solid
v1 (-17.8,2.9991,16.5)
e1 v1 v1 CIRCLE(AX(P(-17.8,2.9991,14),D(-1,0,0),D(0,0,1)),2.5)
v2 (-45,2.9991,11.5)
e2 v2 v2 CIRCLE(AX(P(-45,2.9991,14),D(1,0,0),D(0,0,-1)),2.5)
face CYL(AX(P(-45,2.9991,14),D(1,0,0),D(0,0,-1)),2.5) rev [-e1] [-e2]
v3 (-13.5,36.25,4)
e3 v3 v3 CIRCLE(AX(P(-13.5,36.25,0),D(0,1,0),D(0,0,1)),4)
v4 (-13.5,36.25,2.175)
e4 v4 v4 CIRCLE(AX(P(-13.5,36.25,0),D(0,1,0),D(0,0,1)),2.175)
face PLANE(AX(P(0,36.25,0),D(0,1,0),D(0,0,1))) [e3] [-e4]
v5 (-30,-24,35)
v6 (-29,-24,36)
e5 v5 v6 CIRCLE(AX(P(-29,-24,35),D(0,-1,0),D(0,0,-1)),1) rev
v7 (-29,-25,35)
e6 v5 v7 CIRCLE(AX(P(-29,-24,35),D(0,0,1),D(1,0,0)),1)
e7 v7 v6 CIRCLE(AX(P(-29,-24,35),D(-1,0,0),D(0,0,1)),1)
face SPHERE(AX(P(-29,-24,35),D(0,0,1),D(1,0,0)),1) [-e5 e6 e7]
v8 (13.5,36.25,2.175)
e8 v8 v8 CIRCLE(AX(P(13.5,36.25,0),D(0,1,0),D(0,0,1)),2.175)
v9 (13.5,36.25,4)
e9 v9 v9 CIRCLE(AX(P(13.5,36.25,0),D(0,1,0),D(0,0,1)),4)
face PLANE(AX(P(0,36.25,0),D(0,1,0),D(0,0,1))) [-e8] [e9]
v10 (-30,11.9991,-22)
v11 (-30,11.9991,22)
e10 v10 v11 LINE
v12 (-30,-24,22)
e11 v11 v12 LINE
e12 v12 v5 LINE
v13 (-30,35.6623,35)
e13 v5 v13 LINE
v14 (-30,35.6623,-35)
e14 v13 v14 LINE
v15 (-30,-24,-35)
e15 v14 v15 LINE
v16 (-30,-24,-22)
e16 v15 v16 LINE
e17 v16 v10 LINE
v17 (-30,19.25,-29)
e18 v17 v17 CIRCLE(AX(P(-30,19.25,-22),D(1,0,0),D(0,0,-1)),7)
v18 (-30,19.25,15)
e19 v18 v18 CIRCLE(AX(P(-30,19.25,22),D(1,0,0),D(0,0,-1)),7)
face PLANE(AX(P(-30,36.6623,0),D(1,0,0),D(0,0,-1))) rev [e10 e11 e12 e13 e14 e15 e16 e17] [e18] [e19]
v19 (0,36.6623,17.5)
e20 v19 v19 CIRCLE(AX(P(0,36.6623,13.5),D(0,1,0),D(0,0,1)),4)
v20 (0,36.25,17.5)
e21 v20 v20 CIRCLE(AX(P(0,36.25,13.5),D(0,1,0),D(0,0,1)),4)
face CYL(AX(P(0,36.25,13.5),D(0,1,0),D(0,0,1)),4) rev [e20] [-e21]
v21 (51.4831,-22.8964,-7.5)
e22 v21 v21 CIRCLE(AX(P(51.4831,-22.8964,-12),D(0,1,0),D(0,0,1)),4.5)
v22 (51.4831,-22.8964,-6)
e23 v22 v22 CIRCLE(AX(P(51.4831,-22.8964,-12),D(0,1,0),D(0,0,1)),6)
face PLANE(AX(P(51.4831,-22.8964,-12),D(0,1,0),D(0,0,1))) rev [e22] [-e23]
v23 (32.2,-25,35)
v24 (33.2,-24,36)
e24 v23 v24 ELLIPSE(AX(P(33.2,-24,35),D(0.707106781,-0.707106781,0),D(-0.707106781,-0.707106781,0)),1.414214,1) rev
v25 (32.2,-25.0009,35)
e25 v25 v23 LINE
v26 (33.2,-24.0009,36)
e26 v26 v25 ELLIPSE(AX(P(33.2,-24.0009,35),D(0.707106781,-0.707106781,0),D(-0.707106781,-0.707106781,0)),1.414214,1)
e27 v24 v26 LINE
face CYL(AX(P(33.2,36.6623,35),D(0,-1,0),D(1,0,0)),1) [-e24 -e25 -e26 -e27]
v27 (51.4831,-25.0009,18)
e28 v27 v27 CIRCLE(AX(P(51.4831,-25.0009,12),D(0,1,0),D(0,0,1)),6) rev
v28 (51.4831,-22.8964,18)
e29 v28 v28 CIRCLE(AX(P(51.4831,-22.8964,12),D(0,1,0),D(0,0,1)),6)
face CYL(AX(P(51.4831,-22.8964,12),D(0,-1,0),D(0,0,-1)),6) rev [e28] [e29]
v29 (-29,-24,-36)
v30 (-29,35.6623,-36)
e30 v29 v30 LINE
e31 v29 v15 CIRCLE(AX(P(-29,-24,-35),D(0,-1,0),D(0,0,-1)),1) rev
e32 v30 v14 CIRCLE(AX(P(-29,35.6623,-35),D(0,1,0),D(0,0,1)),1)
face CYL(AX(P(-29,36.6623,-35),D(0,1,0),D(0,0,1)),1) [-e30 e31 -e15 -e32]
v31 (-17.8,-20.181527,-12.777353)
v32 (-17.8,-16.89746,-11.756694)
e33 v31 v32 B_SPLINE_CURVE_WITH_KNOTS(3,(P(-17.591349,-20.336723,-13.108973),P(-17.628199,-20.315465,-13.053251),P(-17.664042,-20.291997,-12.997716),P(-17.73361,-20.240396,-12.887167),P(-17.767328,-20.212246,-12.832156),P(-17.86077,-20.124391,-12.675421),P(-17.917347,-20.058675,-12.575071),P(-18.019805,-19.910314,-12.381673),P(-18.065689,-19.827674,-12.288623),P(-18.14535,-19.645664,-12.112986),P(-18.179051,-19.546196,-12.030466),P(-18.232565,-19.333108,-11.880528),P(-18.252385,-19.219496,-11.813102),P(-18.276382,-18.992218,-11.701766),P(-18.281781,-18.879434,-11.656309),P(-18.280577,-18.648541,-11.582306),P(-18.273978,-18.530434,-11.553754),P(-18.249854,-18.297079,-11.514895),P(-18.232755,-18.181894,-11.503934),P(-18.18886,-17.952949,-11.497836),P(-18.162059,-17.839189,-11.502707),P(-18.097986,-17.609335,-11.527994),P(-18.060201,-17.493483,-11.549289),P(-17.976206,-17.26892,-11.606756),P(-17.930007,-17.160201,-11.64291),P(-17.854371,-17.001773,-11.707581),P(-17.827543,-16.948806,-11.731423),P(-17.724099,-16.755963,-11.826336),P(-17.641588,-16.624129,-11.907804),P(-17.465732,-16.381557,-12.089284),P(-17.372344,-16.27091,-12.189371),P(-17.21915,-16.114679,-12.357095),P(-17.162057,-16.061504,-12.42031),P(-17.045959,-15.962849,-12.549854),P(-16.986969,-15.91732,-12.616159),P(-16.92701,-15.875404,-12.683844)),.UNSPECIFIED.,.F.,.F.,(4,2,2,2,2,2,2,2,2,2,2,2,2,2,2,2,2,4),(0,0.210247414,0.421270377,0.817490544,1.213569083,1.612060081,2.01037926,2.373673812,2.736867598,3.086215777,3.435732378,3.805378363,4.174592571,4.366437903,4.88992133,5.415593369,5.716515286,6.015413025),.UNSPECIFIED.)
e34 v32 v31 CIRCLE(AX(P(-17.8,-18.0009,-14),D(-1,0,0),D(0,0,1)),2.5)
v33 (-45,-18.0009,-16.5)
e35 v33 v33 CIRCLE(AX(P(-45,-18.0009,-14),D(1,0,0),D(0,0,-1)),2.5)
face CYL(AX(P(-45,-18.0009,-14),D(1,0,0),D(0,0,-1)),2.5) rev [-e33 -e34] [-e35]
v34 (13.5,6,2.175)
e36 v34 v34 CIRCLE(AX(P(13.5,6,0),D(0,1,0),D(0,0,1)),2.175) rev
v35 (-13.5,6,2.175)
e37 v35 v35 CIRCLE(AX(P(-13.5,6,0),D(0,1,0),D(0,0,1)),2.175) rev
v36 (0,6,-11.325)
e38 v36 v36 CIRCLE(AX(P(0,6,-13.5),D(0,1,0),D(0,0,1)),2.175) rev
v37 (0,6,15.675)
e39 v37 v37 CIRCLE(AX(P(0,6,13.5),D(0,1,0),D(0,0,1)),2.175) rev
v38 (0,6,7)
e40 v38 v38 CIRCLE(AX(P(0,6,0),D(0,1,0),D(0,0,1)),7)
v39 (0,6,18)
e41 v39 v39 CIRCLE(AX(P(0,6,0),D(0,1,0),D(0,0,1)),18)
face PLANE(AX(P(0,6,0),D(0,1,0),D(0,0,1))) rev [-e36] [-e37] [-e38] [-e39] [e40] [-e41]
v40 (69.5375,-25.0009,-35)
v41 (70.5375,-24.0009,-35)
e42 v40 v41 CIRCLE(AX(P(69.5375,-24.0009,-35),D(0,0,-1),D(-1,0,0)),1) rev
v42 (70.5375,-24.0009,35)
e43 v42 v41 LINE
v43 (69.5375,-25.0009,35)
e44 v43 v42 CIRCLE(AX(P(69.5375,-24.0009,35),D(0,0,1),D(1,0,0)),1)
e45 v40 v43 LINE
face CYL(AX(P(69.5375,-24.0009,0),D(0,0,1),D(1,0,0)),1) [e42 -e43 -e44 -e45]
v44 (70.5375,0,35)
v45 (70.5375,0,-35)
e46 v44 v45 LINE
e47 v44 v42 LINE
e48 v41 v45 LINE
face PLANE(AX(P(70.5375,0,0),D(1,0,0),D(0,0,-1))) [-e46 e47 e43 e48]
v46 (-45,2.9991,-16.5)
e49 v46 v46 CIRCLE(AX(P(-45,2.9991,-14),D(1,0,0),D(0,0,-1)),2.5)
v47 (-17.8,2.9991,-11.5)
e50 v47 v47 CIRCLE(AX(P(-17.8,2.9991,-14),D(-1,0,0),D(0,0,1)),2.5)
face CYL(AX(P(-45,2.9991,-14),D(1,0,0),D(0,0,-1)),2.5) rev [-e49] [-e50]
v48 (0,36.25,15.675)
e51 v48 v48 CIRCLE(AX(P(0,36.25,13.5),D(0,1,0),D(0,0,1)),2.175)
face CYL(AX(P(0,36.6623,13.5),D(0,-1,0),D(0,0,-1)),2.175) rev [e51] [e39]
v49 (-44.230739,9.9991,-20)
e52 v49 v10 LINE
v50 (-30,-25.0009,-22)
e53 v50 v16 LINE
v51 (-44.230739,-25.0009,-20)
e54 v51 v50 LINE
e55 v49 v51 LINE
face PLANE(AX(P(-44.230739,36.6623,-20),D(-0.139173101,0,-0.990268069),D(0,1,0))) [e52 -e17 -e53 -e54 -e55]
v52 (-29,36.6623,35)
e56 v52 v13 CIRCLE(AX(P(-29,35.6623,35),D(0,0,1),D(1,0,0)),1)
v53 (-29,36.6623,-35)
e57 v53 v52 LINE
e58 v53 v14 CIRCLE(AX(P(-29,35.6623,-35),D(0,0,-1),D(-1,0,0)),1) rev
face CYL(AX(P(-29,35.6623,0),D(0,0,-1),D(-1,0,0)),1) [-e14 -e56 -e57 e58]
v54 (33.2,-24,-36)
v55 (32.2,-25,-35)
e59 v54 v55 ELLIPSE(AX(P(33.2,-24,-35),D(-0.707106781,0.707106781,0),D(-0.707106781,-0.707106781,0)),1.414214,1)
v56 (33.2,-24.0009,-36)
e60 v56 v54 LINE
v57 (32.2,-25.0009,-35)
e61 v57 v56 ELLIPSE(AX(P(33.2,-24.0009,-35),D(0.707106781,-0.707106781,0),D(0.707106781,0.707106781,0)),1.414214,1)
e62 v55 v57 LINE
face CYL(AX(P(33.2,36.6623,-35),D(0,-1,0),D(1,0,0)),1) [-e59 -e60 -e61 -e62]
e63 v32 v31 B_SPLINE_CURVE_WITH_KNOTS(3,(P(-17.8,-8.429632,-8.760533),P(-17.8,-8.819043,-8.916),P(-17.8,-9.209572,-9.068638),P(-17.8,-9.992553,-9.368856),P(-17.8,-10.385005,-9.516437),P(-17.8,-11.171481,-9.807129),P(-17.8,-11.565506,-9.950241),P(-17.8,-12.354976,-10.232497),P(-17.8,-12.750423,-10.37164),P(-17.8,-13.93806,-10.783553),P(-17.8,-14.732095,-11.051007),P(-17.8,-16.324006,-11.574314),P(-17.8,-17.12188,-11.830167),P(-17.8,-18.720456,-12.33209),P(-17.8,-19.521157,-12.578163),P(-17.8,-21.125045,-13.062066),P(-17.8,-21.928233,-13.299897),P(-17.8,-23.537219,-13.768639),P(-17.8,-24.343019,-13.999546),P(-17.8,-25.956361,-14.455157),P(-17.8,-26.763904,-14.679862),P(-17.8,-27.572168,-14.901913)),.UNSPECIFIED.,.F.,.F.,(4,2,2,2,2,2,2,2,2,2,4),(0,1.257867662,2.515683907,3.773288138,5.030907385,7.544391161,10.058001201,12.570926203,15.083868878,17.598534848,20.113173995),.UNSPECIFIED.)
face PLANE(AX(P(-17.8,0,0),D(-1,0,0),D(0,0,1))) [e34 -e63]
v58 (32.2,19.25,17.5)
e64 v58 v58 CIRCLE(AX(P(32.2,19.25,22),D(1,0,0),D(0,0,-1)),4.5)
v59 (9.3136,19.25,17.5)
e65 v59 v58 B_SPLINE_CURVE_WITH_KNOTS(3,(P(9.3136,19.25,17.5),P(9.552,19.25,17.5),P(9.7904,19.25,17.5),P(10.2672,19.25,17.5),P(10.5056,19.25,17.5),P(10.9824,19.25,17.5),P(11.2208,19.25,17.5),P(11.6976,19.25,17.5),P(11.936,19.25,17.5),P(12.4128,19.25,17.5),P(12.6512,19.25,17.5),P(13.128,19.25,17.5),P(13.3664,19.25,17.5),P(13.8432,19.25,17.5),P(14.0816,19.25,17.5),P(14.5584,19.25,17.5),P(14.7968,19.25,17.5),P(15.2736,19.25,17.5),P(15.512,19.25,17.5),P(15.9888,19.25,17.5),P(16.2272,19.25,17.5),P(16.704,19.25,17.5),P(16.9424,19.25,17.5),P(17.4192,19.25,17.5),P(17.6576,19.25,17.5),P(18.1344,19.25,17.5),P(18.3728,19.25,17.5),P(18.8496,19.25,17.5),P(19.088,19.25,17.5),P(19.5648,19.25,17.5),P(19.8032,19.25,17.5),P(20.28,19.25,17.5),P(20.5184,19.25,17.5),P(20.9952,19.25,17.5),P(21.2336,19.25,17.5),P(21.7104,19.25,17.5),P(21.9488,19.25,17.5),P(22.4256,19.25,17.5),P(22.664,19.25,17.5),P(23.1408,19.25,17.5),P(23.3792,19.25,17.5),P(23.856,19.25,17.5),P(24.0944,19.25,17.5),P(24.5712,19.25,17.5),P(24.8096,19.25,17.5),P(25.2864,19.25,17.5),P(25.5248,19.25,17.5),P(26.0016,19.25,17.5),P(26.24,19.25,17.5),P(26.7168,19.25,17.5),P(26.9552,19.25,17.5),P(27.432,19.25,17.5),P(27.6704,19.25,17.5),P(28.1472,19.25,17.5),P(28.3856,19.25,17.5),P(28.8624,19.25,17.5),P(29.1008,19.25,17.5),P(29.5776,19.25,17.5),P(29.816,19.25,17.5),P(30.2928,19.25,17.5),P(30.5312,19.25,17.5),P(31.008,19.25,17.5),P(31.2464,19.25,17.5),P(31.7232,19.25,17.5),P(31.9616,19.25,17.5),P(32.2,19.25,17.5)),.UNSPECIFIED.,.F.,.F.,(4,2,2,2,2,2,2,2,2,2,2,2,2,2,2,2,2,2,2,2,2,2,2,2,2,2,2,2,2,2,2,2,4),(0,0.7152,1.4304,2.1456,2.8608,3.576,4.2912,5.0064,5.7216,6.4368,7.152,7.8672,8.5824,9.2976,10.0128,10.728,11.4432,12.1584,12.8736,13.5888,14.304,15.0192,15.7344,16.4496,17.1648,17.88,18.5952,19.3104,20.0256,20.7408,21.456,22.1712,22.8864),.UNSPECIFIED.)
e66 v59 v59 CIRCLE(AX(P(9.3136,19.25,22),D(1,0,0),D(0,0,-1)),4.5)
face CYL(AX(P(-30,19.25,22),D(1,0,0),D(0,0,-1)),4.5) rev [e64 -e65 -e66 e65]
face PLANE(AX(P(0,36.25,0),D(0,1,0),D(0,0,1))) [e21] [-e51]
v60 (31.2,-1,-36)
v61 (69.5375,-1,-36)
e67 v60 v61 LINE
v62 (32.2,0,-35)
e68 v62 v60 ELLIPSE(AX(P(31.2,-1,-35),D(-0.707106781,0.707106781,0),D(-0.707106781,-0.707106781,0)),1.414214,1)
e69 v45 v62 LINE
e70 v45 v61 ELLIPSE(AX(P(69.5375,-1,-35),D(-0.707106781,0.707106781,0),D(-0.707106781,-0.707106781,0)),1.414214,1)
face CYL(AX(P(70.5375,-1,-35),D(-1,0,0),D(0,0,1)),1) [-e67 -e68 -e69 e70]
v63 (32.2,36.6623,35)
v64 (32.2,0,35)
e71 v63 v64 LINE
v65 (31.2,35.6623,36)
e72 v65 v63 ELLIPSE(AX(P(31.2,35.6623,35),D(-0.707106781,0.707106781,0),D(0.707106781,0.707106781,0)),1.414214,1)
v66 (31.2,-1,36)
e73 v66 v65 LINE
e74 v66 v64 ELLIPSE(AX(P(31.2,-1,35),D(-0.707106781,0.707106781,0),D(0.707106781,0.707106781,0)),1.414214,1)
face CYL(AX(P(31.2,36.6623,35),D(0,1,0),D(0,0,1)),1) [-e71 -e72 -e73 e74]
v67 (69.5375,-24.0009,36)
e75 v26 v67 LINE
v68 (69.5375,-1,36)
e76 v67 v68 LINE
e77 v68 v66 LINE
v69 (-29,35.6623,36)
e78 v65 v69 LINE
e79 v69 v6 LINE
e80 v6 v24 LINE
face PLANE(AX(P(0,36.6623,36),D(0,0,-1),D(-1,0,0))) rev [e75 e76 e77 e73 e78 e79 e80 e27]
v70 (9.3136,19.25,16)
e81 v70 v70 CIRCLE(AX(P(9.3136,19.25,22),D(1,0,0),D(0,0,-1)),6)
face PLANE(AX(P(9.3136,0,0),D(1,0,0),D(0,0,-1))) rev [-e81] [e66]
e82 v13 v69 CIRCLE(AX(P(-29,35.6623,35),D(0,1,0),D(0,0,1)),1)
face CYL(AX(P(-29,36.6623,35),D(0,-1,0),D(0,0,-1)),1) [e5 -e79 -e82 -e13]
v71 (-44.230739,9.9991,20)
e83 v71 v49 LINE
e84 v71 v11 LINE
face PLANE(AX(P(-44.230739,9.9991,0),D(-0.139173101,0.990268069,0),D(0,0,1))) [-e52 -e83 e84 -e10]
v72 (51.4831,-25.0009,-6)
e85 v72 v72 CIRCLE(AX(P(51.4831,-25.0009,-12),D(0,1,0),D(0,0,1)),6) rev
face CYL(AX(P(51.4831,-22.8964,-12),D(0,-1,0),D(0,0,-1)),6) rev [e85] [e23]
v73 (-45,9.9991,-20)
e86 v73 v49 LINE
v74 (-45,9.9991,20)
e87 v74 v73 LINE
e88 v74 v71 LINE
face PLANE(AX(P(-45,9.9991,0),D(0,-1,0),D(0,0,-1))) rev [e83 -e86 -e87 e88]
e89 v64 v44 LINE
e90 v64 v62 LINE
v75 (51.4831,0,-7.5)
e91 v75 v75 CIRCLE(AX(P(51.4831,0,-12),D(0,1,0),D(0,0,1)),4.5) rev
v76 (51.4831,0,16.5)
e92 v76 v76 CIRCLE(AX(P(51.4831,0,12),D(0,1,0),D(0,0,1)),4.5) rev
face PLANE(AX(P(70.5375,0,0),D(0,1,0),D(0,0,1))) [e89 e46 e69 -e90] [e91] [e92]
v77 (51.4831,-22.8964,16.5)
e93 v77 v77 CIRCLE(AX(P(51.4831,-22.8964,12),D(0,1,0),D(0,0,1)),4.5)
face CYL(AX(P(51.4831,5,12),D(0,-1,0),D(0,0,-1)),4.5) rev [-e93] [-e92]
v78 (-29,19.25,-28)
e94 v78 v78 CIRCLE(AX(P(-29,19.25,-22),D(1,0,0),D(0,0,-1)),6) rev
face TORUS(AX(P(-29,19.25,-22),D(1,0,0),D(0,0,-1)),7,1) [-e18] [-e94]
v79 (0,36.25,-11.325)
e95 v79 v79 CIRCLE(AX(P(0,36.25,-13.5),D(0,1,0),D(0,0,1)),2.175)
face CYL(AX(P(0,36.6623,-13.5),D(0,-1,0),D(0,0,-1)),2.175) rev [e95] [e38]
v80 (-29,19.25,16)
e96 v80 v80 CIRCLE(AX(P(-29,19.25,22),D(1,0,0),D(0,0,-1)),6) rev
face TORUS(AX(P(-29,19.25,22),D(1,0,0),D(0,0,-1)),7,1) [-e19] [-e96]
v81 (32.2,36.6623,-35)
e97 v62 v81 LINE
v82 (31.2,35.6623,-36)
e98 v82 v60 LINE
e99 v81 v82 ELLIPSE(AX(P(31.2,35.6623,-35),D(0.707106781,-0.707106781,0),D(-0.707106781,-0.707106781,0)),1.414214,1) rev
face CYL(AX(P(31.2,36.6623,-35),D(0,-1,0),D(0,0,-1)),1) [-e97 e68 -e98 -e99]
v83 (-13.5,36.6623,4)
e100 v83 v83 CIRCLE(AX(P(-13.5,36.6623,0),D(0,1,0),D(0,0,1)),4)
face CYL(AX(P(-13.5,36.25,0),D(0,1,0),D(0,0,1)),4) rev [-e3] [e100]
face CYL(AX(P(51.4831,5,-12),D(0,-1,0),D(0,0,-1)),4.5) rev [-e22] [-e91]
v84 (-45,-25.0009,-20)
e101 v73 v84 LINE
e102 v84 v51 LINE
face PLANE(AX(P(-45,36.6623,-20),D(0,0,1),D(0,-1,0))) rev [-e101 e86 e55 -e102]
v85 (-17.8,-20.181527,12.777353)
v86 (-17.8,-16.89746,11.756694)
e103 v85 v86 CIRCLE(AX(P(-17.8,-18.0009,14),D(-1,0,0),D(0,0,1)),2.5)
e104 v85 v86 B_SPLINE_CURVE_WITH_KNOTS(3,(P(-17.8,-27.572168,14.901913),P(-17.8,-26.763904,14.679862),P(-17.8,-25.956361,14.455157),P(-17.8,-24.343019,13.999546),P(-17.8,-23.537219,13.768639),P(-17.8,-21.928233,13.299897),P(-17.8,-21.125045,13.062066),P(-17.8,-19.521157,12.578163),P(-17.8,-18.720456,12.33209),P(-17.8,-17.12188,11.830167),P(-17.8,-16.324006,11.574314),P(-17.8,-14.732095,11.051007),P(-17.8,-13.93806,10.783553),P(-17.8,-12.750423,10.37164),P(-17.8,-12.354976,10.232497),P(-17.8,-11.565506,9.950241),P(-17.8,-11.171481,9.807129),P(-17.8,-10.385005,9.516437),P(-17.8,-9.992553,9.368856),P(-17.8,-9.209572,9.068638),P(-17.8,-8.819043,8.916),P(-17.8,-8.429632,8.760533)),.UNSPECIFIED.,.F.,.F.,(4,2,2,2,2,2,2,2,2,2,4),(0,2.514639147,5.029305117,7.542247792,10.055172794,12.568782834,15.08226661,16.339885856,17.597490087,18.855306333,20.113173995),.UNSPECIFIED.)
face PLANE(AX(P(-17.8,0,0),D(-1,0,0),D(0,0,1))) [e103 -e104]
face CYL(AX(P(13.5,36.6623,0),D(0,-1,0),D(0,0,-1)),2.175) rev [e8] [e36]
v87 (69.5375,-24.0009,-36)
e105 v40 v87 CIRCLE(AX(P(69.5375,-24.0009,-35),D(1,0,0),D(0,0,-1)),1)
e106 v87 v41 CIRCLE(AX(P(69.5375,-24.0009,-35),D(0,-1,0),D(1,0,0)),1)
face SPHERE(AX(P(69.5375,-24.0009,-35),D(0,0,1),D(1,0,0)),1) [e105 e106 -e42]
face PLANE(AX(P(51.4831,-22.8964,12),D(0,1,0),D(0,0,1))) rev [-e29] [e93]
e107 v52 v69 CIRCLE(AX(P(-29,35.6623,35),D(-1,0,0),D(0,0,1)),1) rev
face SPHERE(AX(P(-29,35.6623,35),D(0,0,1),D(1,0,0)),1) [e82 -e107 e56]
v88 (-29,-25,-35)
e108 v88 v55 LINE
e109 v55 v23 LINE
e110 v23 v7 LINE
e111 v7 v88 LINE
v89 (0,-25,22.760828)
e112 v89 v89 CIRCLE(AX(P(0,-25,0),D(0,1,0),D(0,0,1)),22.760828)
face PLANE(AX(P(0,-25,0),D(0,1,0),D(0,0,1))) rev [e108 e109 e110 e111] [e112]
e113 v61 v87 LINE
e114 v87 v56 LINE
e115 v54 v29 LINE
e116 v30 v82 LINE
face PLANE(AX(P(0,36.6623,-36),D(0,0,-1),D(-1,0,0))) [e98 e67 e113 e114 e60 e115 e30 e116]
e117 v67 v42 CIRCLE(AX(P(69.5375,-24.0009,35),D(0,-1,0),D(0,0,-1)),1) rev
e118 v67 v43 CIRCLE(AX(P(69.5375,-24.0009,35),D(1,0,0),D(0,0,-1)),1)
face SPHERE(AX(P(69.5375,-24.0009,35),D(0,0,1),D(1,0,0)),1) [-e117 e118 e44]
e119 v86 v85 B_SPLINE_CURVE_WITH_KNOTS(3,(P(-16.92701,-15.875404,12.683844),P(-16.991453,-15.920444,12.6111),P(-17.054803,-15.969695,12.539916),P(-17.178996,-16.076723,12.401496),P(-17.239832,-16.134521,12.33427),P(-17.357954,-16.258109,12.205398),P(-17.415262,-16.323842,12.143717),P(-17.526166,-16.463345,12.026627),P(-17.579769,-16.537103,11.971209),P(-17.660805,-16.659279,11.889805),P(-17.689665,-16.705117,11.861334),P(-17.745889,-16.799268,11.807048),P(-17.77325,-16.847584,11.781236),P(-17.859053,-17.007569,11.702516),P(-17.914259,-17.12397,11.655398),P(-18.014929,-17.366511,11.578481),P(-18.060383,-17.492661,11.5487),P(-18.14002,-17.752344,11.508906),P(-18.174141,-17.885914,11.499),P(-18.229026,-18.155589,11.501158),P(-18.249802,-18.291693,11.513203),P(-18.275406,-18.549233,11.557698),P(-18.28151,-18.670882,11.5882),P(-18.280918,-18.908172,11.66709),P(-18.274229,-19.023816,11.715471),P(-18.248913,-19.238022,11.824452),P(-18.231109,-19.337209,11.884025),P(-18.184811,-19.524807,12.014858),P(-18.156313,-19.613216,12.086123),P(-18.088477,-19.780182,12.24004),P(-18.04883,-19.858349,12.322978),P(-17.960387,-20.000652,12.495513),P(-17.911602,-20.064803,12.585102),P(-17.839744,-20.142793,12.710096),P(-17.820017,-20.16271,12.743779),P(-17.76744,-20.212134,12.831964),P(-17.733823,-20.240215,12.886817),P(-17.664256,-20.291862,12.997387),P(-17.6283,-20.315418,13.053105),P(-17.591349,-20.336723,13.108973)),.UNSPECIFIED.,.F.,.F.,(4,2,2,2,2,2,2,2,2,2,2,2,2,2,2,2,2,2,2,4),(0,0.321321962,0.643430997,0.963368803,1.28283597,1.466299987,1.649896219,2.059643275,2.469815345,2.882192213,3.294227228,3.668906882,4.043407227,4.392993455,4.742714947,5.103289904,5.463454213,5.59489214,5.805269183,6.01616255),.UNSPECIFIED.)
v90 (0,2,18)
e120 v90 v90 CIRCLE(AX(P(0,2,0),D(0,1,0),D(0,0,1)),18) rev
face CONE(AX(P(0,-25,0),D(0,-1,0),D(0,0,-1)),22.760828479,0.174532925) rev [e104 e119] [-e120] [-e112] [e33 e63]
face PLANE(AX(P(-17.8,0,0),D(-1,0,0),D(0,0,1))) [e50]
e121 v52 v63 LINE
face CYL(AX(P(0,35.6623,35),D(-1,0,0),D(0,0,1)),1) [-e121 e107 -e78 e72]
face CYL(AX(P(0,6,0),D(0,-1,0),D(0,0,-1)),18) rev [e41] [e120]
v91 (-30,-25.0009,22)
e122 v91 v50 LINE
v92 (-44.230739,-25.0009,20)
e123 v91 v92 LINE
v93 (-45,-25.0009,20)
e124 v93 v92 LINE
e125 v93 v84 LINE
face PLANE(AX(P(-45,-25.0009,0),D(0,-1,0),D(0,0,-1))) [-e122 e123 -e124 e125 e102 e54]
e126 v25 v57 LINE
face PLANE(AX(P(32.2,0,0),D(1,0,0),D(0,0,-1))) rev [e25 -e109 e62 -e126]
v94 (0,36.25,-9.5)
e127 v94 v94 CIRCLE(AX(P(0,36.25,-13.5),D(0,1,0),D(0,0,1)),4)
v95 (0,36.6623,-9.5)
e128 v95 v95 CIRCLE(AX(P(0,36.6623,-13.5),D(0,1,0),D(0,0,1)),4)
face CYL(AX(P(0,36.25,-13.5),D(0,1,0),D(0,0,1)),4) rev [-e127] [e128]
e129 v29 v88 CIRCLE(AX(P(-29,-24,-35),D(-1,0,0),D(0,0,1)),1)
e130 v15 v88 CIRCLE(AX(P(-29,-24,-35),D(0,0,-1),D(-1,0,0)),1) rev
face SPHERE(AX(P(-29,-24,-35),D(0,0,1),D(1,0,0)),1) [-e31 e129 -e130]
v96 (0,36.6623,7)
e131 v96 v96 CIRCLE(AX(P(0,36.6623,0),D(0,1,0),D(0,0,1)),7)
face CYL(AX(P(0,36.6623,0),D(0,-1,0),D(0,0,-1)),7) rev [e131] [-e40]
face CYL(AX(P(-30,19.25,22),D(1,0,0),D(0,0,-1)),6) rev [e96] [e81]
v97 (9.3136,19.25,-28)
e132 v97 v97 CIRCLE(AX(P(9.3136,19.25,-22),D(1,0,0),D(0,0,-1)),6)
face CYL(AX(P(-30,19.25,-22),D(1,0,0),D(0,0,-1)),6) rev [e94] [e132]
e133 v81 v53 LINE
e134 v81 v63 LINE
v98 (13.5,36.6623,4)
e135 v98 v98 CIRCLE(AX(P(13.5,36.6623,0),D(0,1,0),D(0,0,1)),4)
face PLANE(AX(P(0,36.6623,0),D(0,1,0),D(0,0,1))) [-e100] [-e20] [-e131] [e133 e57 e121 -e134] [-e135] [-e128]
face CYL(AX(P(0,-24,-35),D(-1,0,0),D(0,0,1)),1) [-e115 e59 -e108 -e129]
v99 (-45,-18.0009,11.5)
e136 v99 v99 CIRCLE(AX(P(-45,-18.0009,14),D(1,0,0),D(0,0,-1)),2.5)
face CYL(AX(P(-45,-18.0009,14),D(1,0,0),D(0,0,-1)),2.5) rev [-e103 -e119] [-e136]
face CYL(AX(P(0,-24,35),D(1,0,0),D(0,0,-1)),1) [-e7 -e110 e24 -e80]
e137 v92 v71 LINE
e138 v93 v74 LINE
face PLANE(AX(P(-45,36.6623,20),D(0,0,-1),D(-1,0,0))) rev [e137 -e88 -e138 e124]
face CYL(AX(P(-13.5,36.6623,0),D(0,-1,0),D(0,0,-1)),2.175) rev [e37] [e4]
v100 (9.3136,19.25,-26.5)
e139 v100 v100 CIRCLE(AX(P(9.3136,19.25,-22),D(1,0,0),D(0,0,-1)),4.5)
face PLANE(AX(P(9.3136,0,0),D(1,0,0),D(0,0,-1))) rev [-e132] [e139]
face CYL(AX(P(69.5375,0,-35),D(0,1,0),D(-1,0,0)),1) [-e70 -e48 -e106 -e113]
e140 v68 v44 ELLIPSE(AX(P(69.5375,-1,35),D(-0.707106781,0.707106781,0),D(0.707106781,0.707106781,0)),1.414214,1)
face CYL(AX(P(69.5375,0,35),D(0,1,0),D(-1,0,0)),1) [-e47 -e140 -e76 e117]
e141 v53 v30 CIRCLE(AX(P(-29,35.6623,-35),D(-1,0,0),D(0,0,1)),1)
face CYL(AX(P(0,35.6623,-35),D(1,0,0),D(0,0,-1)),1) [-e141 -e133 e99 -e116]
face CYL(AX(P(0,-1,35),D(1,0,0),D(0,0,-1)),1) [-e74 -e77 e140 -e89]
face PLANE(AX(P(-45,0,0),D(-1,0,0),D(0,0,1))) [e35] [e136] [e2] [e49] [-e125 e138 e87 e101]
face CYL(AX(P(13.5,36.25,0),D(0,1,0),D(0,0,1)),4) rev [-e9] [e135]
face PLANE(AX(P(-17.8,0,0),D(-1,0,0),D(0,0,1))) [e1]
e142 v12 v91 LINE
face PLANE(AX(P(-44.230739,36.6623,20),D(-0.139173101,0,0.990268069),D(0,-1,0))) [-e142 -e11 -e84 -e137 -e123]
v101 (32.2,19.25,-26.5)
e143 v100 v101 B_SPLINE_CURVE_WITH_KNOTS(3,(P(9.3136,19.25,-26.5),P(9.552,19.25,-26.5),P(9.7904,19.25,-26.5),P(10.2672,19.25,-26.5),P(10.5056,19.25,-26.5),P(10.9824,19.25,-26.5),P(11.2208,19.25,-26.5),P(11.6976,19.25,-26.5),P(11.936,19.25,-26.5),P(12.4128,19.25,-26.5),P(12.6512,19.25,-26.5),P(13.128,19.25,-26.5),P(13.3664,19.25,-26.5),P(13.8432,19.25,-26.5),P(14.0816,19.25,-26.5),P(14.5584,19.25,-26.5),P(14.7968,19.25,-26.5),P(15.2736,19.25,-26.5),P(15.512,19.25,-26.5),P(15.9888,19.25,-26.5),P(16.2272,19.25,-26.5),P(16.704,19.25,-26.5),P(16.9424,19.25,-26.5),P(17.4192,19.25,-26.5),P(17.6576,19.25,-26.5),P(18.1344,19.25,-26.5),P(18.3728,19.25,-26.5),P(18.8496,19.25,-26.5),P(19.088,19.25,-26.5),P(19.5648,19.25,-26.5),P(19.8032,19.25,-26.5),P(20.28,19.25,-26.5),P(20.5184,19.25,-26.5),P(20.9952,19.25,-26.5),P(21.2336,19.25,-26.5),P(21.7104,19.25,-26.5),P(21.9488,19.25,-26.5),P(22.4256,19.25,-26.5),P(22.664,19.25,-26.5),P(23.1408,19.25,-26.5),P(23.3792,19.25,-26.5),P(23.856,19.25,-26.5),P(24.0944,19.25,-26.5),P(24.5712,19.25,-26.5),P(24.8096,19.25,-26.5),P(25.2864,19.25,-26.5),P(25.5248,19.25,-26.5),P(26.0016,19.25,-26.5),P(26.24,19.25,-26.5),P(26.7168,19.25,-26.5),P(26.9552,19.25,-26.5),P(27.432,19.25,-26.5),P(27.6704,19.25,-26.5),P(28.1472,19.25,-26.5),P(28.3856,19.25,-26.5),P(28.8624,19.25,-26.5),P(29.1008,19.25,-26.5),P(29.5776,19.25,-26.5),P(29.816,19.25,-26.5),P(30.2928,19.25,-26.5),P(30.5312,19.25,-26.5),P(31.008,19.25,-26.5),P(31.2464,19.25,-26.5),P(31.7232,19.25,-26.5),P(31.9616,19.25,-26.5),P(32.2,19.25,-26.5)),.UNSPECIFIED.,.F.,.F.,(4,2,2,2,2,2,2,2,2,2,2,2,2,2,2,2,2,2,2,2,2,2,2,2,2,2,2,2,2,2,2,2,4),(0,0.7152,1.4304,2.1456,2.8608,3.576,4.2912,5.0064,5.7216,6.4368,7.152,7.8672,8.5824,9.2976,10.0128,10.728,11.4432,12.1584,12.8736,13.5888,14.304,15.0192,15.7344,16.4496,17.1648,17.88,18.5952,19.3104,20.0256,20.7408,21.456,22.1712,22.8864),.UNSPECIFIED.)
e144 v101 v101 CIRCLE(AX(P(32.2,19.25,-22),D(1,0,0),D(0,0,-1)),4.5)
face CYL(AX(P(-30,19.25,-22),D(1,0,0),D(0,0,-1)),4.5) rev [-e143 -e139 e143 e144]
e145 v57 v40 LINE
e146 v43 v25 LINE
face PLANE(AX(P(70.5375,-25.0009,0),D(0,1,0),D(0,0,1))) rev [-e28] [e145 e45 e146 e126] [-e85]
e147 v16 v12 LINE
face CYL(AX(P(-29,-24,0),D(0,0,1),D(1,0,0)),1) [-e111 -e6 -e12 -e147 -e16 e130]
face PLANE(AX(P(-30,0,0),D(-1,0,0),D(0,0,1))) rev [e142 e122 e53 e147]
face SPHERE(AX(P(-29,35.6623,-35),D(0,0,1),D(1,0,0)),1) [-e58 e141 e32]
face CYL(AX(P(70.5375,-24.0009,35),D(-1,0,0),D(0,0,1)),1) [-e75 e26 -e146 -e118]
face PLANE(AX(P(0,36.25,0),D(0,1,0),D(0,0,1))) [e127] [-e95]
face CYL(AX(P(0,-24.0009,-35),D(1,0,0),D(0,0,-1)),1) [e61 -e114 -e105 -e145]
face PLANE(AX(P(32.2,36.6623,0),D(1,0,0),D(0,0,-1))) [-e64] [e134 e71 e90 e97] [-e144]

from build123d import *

# Parameters (mm, degrees)
SKETCH1_W               = 62.2
SKETCH1_H               = 72
SKETCH1_R               = 18
SKETCH1_R_2             = 2.175
SKETCH1_R_3             = 7
SKETCH1_R_4             = 9.5
SKETCH1_R_5             = 4
BOSS_EXTRUDE1_DEPTH     = 36.6623
SKETCH1_3_R             = 18
CUT_EXTRUDE1_DEPTH      = 6
SKETCH2_R               = 4.5
CUT_EXTRUDE3_DEPTH      = 81.678152193
BOSS_EXTRUDE2_START     = -25
SKETCH1_6_W             = 62.2
SKETCH1_6_H             = 72
SKETCH1_6_R             = 18
BOSS_EXTRUDE2_DEPTH     = 25
SKETCH2_3_W             = 72
SKETCH2_3_H             = 25.0009
BOSS_EXTRUDE3_DEPTH     = 38.3375
SKETCH1_7_R             = 2.175
CUT_EXTRUDE4_DEPTH      = 88.267766945
CUT_EXTRUDE6_START      = 36.25
SKETCH1_8_R             = 4
SKETCH1_8_R_2           = 2.175
CUT_EXTRUDE6_DEPTH      = 5
CUT_EXTRUDE7_DEPTH      = 5
CUT_EXTRUDE7_DEPTH_BACK = 88.267766945
SKETCH1_9_R             = 4.5
CUT_EXTRUDE8_START      = -22.8864
SKETCH2_4_R             = 6
SKETCH2_4_R_2           = 4.5
CUT_EXTRUDE8_DEPTH      = 58.791752193
CUT_EXTRUDE9_START      = -25.01
SKETCH1_10_R            = 6
CUT_EXTRUDE9_DEPTH      = 2.1136
CHAMFER1_SIZE           = 27
CHAMFER1_SIZE2          = 4.760828479
FILLET1_R               = 1
BOSS_EXTRUDE4_START     = 62.2
SKETCH5_R               = 6
SKETCH5_W               = 40
SKETCH5_H               = 35
SKETCH5_R_2             = 2.5
BOSS_EXTRUDE4_DEPTH     = 15
CUT_EXTRUDE10_START     = 50
SKETCH5_2_R             = 2.5
CUT_EXTRUDE10_DEPTH     = 43.735992157
CHAMFER2_SIZE           = 2
CHAMFER2_SIZE_2         = 14.230739445


with BuildPart() as part:
    # Sketch1 → Boss-Extrude1 (new body)
    # profile 1 of 11: a face of its own
    with BuildSketch(Plane(origin=(0, 0, 0), x_dir=(1, 0, 0), z_dir=(0, 1, 0))):
        with Locations((1.1, 0)):
            Rectangle(SKETCH1_W, SKETCH1_H)
        Circle(SKETCH1_R, mode=Mode.SUBTRACT)
    # profile 2 of 11: a face of its own
    with BuildSketch(Plane(origin=(0, 0, 0), x_dir=(1, 0, 0), z_dir=(0, 1, 0))):
        Circle(SKETCH1_R)
        with Locations((0, -13.5)):
            Circle(SKETCH1_R_2, mode=Mode.SUBTRACT)
        with Locations((13.5, 0)):
            Circle(SKETCH1_R_2, mode=Mode.SUBTRACT)
        with Locations((0, 13.5)):
            Circle(SKETCH1_R_2, mode=Mode.SUBTRACT)
        with Locations((-13.5, 0)):
            Circle(SKETCH1_R_2, mode=Mode.SUBTRACT)
        with Locations(Location((0, 0, 0), (0, 0, 270))):
            Circle(SKETCH1_R_3, mode=Mode.SUBTRACT)
    # profile 3 of 11: a face of its own
    with BuildSketch(Plane(origin=(0, 0, 0), x_dir=(1, 0, 0), z_dir=(0, 1, 0))):
        Circle(SKETCH1_R_4)
        with Locations(Location((0, 0, 0), (0, 0, 270))):
            Circle(SKETCH1_R_3, mode=Mode.SUBTRACT)
    # profile 4 of 11: a face of its own
    with BuildSketch(Plane(origin=(0, 0, 0), x_dir=(1, 0, 0), z_dir=(0, 1, 0))):
        with Locations((-13.5, 0)):
            Circle(SKETCH1_R_5)
        with Locations((-13.5, 0)):
            Circle(SKETCH1_R_2, mode=Mode.SUBTRACT)
    # profile 5 of 11: a face of its own
    with BuildSketch(Plane(origin=(0, 0, 0), x_dir=(1, 0, 0), z_dir=(0, 1, 0))):
        with Locations((-13.5, 0)):
            Circle(SKETCH1_R_2)
    # profile 6 of 11: a face of its own
    with BuildSketch(Plane(origin=(0, 0, 0), x_dir=(1, 0, 0), z_dir=(0, 1, 0))):
        with Locations((0, -13.5)):
            Circle(SKETCH1_R_5)
        with Locations((0, -13.5)):
            Circle(SKETCH1_R_2, mode=Mode.SUBTRACT)
    # profile 7 of 11: a face of its own
    with BuildSketch(Plane(origin=(0, 0, 0), x_dir=(1, 0, 0), z_dir=(0, 1, 0))):
        with Locations((0, -13.5)):
            Circle(SKETCH1_R_2)
    # profile 8 of 11: a face of its own
    with BuildSketch(Plane(origin=(0, 0, 0), x_dir=(1, 0, 0), z_dir=(0, 1, 0))):
        with Locations((13.5, 0)):
            Circle(SKETCH1_R_5)
        with Locations((13.5, 0)):
            Circle(SKETCH1_R_2, mode=Mode.SUBTRACT)
    # profile 9 of 11: a face of its own
    with BuildSketch(Plane(origin=(0, 0, 0), x_dir=(1, 0, 0), z_dir=(0, 1, 0))):
        with Locations((13.5, 0)):
            Circle(SKETCH1_R_2)
    # profile 10 of 11: a face of its own
    with BuildSketch(Plane(origin=(0, 0, 0), x_dir=(1, 0, 0), z_dir=(0, 1, 0))):
        with Locations((0, 13.5)):
            Circle(SKETCH1_R_5)
        with Locations((0, 13.5)):
            Circle(SKETCH1_R_2, mode=Mode.SUBTRACT)
    # profile 11 of 11: a face of its own
    with BuildSketch(Plane(origin=(0, 0, 0), x_dir=(1, 0, 0), z_dir=(0, 1, 0))):
        with Locations((0, 13.5)):
            Circle(SKETCH1_R_2)
    extrude(amount=BOSS_EXTRUDE1_DEPTH)

    # Sketch1<3> → Cut-Extrude1 (cut)
    with BuildSketch(Plane(origin=(0, 0, 0), x_dir=(1, 0, 0), z_dir=(0, 1, 0))):
        with Locations(Location((0, 0, 0), (0, 0, 270))):
            Circle(SKETCH1_3_R)
    extrude(amount=CUT_EXTRUDE1_DEPTH, mode=Mode.SUBTRACT)

    # Sketch2 → Cut-Extrude3 (cut, through all)
    with BuildSketch(Plane(origin=(32.2, 0, 0), x_dir=(0, 0, -1), z_dir=(1, 0, 0))):
        with Locations((-22, 19.25)):
            Circle(SKETCH2_R)
        with Locations((22, 19.25)):
            Circle(SKETCH2_R)
    extrude(amount=-CUT_EXTRUDE3_DEPTH, mode=Mode.SUBTRACT)

    # Sketch1<6> → Boss-Extrude2 (add)
    with BuildSketch(Plane(origin=(0, 0, 0), x_dir=(1, 0, 0), z_dir=(0, 1, 0)).offset(BOSS_EXTRUDE2_START)):
        with Locations((1.1, 0)):
            Rectangle(SKETCH1_6_W, SKETCH1_6_H)
        with Locations(Location((0, 0, 0), (0, 0, 270))):
            Circle(SKETCH1_6_R, mode=Mode.SUBTRACT)
    extrude(amount=BOSS_EXTRUDE2_DEPTH)

    # Sketch2<3> → Boss-Extrude3 (add)
    with BuildSketch(Plane(origin=(32.2, 0, 0), x_dir=(0, 0, -1), z_dir=(1, 0, 0))):
        with Locations((0, -12.50045)):
            Rectangle(SKETCH2_3_W, SKETCH2_3_H)
    extrude(amount=BOSS_EXTRUDE3_DEPTH)

    # Sketch1<7> → Cut-Extrude4 (cut, through all)
    with BuildSketch(Plane(origin=(0, 0, 0), x_dir=(1, 0, 0), z_dir=(0, 1, 0))):
        with Locations(Location((-13.5, 0, 0), (0, 0, 270))):
            Circle(SKETCH1_7_R)
        with Locations(Location((0, -13.5, 0), (0, 0, 270))):
            Circle(SKETCH1_7_R)
        with Locations(Location((13.5, 0, 0), (0, 0, 270))):
            Circle(SKETCH1_7_R)
        with Locations(Location((0, 13.5, 0), (0, 0, 270))):
            Circle(SKETCH1_7_R)
    extrude(amount=CUT_EXTRUDE4_DEPTH, mode=Mode.SUBTRACT)

    # Sketch1<8> → Cut-Extrude6 (cut)
    # profile 1 of 4: a face of its own
    with BuildSketch(Plane(origin=(0, 0, 0), x_dir=(1, 0, 0), z_dir=(0, 1, 0)).offset(CUT_EXTRUDE6_START)):
        with Locations(Location((-13.5, 0, 0), (0, 0, 270))):
            Circle(SKETCH1_8_R)
        with Locations(Location((-13.5, 0, 0), (0, 0, 270))):
            Circle(SKETCH1_8_R_2, mode=Mode.SUBTRACT)
    # profile 2 of 4: a face of its own
    with BuildSketch(Plane(origin=(0, 0, 0), x_dir=(1, 0, 0), z_dir=(0, 1, 0)).offset(CUT_EXTRUDE6_START)):
        with Locations(Location((0, -13.5, 0), (0, 0, 270))):
            Circle(SKETCH1_8_R)
        with Locations(Location((0, -13.5, 0), (0, 0, 270))):
            Circle(SKETCH1_8_R_2, mode=Mode.SUBTRACT)
    # profile 3 of 4: a face of its own
    with BuildSketch(Plane(origin=(0, 0, 0), x_dir=(1, 0, 0), z_dir=(0, 1, 0)).offset(CUT_EXTRUDE6_START)):
        with Locations(Location((13.5, 0, 0), (0, 0, 270))):
            Circle(SKETCH1_8_R)
        with Locations(Location((13.5, 0, 0), (0, 0, 270))):
            Circle(SKETCH1_8_R_2, mode=Mode.SUBTRACT)
    # profile 4 of 4: a face of its own
    with BuildSketch(Plane(origin=(0, 0, 0), x_dir=(1, 0, 0), z_dir=(0, 1, 0)).offset(CUT_EXTRUDE6_START)):
        with Locations(Location((0, 13.5, 0), (0, 0, 270))):
            Circle(SKETCH1_8_R)
        with Locations(Location((0, 13.5, 0), (0, 0, 270))):
            Circle(SKETCH1_8_R_2, mode=Mode.SUBTRACT)
    extrude(amount=CUT_EXTRUDE6_DEPTH, mode=Mode.SUBTRACT)

    # Sketch1<9> → Cut-Extrude7 (cut, two sides: drawn at the far end of the back side and taken through both)
    with BuildSketch(Plane(origin=(0, 0, 0), x_dir=(1, 0, 0), z_dir=(0, 1, 0)).offset(-CUT_EXTRUDE7_DEPTH_BACK)):
        with Locations(Location((51.4831, -12, 0), (0, 0, 270))):
            Circle(SKETCH1_9_R)
        with Locations(Location((51.4831, 12, 0), (0, 0, 270))):
            Circle(SKETCH1_9_R)
    extrude(amount=CUT_EXTRUDE7_DEPTH + CUT_EXTRUDE7_DEPTH_BACK, mode=Mode.SUBTRACT)

    # Sketch2<4> → Cut-Extrude8 (cut, through all)
    # profile 1 of 2: a face of its own
    with BuildSketch(Plane(origin=(32.2, 0, 0), x_dir=(0, 0, -1), z_dir=(1, 0, 0)).offset(CUT_EXTRUDE8_START)):
        with Locations((-22, 19.25)):
            Circle(SKETCH2_4_R)
        with Locations((-22, 19.25)):
            Circle(SKETCH2_4_R_2, mode=Mode.SUBTRACT)
    # profile 2 of 2: a face of its own
    with BuildSketch(Plane(origin=(32.2, 0, 0), x_dir=(0, 0, -1), z_dir=(1, 0, 0)).offset(CUT_EXTRUDE8_START)):
        with Locations((22, 19.25)):
            Circle(SKETCH2_4_R)
        with Locations((22, 19.25)):
            Circle(SKETCH2_4_R_2, mode=Mode.SUBTRACT)
    extrude(amount=-CUT_EXTRUDE8_DEPTH, mode=Mode.SUBTRACT)

    # Sketch1<10> → Cut-Extrude9 (cut)
    with BuildSketch(Plane(origin=(0, 0, 0), x_dir=(1, 0, 0), z_dir=(0, 1, 0)).offset(CUT_EXTRUDE9_START)):
        with Locations(Location((51.4831, 12, 0), (0, 0, 270))):
            Circle(SKETCH1_10_R)
        with Locations(Location((51.4831, -12, 0), (0, 0, 270))):
            Circle(SKETCH1_10_R)
    extrude(amount=CUT_EXTRUDE9_DEPTH, mode=Mode.SUBTRACT)

    # Chamfer1
    chamfer1_edges = [part.edges().sort_by_distance(p)[0] for p in [
        (0, -25, -18),
    ]]
    chamfer1_side = [part.faces().sort_by_distance(p)[0] for p in [
        (0, -9.5, -18),
    ]]
    chamfer(chamfer1_edges, length=CHAMFER1_SIZE, length2=CHAMFER1_SIZE2, reference=chamfer1_side[0])

    # Fillet1
    fillet1_edges = [part.edges().sort_by_distance(p)[0] for p in [
        (32.2, 18.33115, 36),
        (-30, 5.83115, 36),
        (-30, 5.83115, -36),
        (1.1, 36.6623, -36),
        (32.2, 18.33115, -36),
        (-30, 19.25, 28),
        (-30, 19.25, -16),
        (-30, 36.6623, 0),
        (1.1, 36.6623, 36),
        (1.1, -25, 36),
        (-30, -25, 0),
        (1.1, -25, -36),
        (51.36875, 0, -36),
        (32.2, -25.00045, 36),
        (51.36875, 0, 36),
        (51.36875, -25.0009, 36),
        (32.2, -25.00045, -36),
        (51.36875, -25.0009, -36),
        (70.5375, -12.50045, 36),
        (70.5375, -25.0009, 0),
        (70.5375, -12.50045, -36),
    ]]
    fillet(fillet1_edges, radius=FILLET1_R)

    # Sketch5 → Boss-Extrude4 (add)
    # profile 1 of 3: a face of its own
    with BuildSketch(Plane.ZY.offset(-32.2).offset(BOSS_EXTRUDE4_START)):
        with Locations(Location((-22, 19.25, 0), (0, 0, 180))):
            Circle(SKETCH5_R)
    # profile 2 of 3: a face of its own
    with BuildSketch(Plane.ZY.offset(-32.2).offset(BOSS_EXTRUDE4_START)):
        with Locations(Location((22, 19.25, 0), (0, 0, 180))):
            Circle(SKETCH5_R)
    # profile 3 of 3: a face of its own
    with BuildSketch(Plane.ZY.offset(-32.2).offset(BOSS_EXTRUDE4_START)):
        with Locations((0, -7.5009)):
            Rectangle(SKETCH5_W, SKETCH5_H)
        with Locations(Location((-14, -18.0009, 0), (0, 0, 180))):
            Circle(SKETCH5_R_2, mode=Mode.SUBTRACT)
        with Locations(Location((-14, 2.9991, 0), (0, 0, 180))):
            Circle(SKETCH5_R_2, mode=Mode.SUBTRACT)
        with Locations(Location((14, -18.0009, 0), (0, 0, 180))):
            Circle(SKETCH5_R_2, mode=Mode.SUBTRACT)
        with Locations(Location((14, 2.9991, 0), (0, 0, 180))):
            Circle(SKETCH5_R_2, mode=Mode.SUBTRACT)
    extrude(amount=BOSS_EXTRUDE4_DEPTH)


with BuildPart() as boss_extrude4_kept_piece:
    # of the separate pieces the step leaves, the one the design keeps (boss_extrude4_pieces_kept)
    add(part.part.solids().sort_by_distance((32.2, -25, -35))[0])

    # Sketch5<2> → Cut-Extrude10 (cut, through all)
    with BuildSketch(Plane.ZY.offset(-32.2).offset(CUT_EXTRUDE10_START)):
        with Locations(Location((14, 2.9991, 0), (0, 0, 180))):
            Circle(SKETCH5_2_R)
        with Locations(Location((14, -18.0009, 0), (0, 0, 180))):
            Circle(SKETCH5_2_R)
        with Locations(Location((-14, -18.0009, 0), (0, 0, 180))):
            Circle(SKETCH5_2_R)
        with Locations(Location((-14, 2.9991, 0), (0, 0, 180))):
            Circle(SKETCH5_2_R)
    extrude(amount=CUT_EXTRUDE10_DEPTH, mode=Mode.SUBTRACT)

    # Chamfer2
    # the kernel refuses this chamfer: 14.230739445, 2 mm, written as the material it adds along each edge
    with BuildSketch(Plane(origin=(-30, 9.9991, -20), x_dir=(0.2616608511941782, 0, -0.9651598825854388), z_dir=(0, -1, 0))) as chamfer2_piece_1_section:
        Polygon((CHAMFER2_SIZE * 0.965159882585, -CHAMFER2_SIZE * 0.261660851194), (-CHAMFER2_SIZE_2 * 0.26166085119, -CHAMFER2_SIZE_2 * 0.96515988257), (0, 0), align=None)
    chamfer2_piece_1 = extrude(amount=70.985703565, mode=Mode.PRIVATE)
    chamfer2_piece_1 = split(chamfer2_piece_1, bisect_by=Plane(origin=(-30, -7.5009, -20.474187654), z_dir=(-1, 0, 0)), keep=Keep.TOP, mode=Mode.PRIVATE)
    chamfer2_piece_1 = split(chamfer2_piece_1, bisect_by=Plane(origin=(-35.437489827, -25.0009, -20.474187654), z_dir=(0, 1, 0)), keep=Keep.TOP, mode=Mode.PRIVATE)
    add(chamfer2_piece_1)
    with BuildSketch(Plane(origin=(-30, 9.9991, 20), x_dir=(-0.999985663281603, -0.005354739139527592, 0), z_dir=(0, 0, -1))) as chamfer2_piece_2:
        Polygon((CHAMFER2_SIZE_2 * 0.999985663265, CHAMFER2_SIZE_2 * 0.00535473913944), (-CHAMFER2_SIZE * 0.00535473913953, CHAMFER2_SIZE * 0.999985663282), (0, 0), align=None)
    extrude(amount=40)
    with BuildSketch(Plane(origin=(-30, -60.986603565, 20), x_dir=(0.2616608511941782, 0, 0.9651598825854388), z_dir=(0, 1, 0))) as chamfer2_piece_3_section:
        Polygon((CHAMFER2_SIZE * 0.965159882585, -CHAMFER2_SIZE * 0.261660851194), (-CHAMFER2_SIZE_2 * 0.26166085119, -CHAMFER2_SIZE_2 * 0.96515988257), (0, 0), align=None)
    chamfer2_piece_3 = extrude(amount=70.985703565, mode=Mode.PRIVATE)
    chamfer2_piece_3 = split(chamfer2_piece_3, bisect_by=Plane(origin=(-35.437489827, -25.0009, 20.474187654), z_dir=(0, 1, 0)), keep=Keep.TOP, mode=Mode.PRIVATE)
    chamfer2_piece_3 = split(chamfer2_piece_3, bisect_by=Plane(origin=(-30, -7.5009, 20.474187654), z_dir=(-1, 0, 0)), keep=Keep.TOP, mode=Mode.PRIVATE)
    add(chamfer2_piece_3)
    with BuildSketch(Plane(origin=(-30, 9.9991, 20), x_dir=(-0.999985663281603, -0.005354739139527592, 0), z_dir=(0, 0, -1))) as chamfer2_piece_4a_section:
        Polygon((CHAMFER2_SIZE_2 * 0.999985663265, CHAMFER2_SIZE_2 * 0.00535473913944), (-CHAMFER2_SIZE * 0.00535473913953, CHAMFER2_SIZE * 0.999985663282), (0, 0), align=None)
    chamfer2_piece_4a = extrude(amount=76.986603565, mode=Mode.PRIVATE)
    chamfer2_piece_4a = split(chamfer2_piece_4a, bisect_by=Plane(origin=(-35.204659453, 10.502886418, -20), z_dir=(0, 0, -1)), keep=Keep.TOP, mode=Mode.PRIVATE)
    with BuildSketch(Plane(origin=(-30, 46.985703565, -20), x_dir=(0.2616608511941782, 0, -0.9651598825854388), z_dir=(0, -1, 0))) as chamfer2_piece_4b_section:
        Polygon((CHAMFER2_SIZE * 0.965159882585, -CHAMFER2_SIZE * 0.261660851194), (-CHAMFER2_SIZE_2 * 0.26166085119, -CHAMFER2_SIZE_2 * 0.96515988257), (0, 0), align=None)
    chamfer2_piece_4b = extrude(amount=107.97230713, mode=Mode.PRIVATE)
    chamfer2_piece_4b = split(chamfer2_piece_4b, bisect_by=Plane(origin=(-35.437489827, 9.9991, -20.474187654), z_dir=(0, 1, 0)), keep=Keep.TOP, mode=Mode.PRIVATE)
    chamfer2_piece_4b = split(chamfer2_piece_4b, bisect_by=Plane(origin=(-30, 28.492401783, -20.474187654), z_dir=(-1, 0, 0)), keep=Keep.TOP, mode=Mode.PRIVATE)
    chamfer2_piece_4 = chamfer2_piece_4a & chamfer2_piece_4b
    add(chamfer2_piece_4)
    with BuildSketch(Plane(origin=(-30, 9.9991, 56.986603565), x_dir=(-0.999985663281603, -0.005354739139527589, 0), z_dir=(0, 0, -1))) as chamfer2_piece_5a_section:
        Polygon((CHAMFER2_SIZE_2 * 0.999985663265, CHAMFER2_SIZE_2 * 0.00535473913944), (-CHAMFER2_SIZE * 0.00535473913953, CHAMFER2_SIZE * 0.999985663282), (0, 0), align=None)
    chamfer2_piece_5a = extrude(amount=76.986603565, mode=Mode.PRIVATE)
    chamfer2_piece_5a = split(chamfer2_piece_5a, bisect_by=Plane(origin=(-35.204659453, 10.502886418, 20), z_dir=(0, 0, 1)), keep=Keep.TOP, mode=Mode.PRIVATE)
    with BuildSketch(Plane(origin=(-30, -60.986603565, 20), x_dir=(0.2616608511941782, 0, 0.9651598825854388), z_dir=(0, 1, 0))) as chamfer2_piece_5b_section:
        Polygon((CHAMFER2_SIZE * 0.965159882585, -CHAMFER2_SIZE * 0.261660851194), (-CHAMFER2_SIZE_2 * 0.26166085119, -CHAMFER2_SIZE_2 * 0.96515988257), (0, 0), align=None)
    chamfer2_piece_5b = extrude(amount=107.97230713, mode=Mode.PRIVATE)
    chamfer2_piece_5b = split(chamfer2_piece_5b, bisect_by=Plane(origin=(-35.437489827, 9.9991, 20.474187654), z_dir=(0, 1, 0)), keep=Keep.TOP, mode=Mode.PRIVATE)
    chamfer2_piece_5b = split(chamfer2_piece_5b, bisect_by=Plane(origin=(-30, 28.492401783, 20.474187654), z_dir=(-1, 0, 0)), keep=Keep.TOP, mode=Mode.PRIVATE)
    chamfer2_piece_5 = chamfer2_piece_5a & chamfer2_piece_5b
    add(chamfer2_piece_5)


solid = boss_extrude4_kept_piece.part
